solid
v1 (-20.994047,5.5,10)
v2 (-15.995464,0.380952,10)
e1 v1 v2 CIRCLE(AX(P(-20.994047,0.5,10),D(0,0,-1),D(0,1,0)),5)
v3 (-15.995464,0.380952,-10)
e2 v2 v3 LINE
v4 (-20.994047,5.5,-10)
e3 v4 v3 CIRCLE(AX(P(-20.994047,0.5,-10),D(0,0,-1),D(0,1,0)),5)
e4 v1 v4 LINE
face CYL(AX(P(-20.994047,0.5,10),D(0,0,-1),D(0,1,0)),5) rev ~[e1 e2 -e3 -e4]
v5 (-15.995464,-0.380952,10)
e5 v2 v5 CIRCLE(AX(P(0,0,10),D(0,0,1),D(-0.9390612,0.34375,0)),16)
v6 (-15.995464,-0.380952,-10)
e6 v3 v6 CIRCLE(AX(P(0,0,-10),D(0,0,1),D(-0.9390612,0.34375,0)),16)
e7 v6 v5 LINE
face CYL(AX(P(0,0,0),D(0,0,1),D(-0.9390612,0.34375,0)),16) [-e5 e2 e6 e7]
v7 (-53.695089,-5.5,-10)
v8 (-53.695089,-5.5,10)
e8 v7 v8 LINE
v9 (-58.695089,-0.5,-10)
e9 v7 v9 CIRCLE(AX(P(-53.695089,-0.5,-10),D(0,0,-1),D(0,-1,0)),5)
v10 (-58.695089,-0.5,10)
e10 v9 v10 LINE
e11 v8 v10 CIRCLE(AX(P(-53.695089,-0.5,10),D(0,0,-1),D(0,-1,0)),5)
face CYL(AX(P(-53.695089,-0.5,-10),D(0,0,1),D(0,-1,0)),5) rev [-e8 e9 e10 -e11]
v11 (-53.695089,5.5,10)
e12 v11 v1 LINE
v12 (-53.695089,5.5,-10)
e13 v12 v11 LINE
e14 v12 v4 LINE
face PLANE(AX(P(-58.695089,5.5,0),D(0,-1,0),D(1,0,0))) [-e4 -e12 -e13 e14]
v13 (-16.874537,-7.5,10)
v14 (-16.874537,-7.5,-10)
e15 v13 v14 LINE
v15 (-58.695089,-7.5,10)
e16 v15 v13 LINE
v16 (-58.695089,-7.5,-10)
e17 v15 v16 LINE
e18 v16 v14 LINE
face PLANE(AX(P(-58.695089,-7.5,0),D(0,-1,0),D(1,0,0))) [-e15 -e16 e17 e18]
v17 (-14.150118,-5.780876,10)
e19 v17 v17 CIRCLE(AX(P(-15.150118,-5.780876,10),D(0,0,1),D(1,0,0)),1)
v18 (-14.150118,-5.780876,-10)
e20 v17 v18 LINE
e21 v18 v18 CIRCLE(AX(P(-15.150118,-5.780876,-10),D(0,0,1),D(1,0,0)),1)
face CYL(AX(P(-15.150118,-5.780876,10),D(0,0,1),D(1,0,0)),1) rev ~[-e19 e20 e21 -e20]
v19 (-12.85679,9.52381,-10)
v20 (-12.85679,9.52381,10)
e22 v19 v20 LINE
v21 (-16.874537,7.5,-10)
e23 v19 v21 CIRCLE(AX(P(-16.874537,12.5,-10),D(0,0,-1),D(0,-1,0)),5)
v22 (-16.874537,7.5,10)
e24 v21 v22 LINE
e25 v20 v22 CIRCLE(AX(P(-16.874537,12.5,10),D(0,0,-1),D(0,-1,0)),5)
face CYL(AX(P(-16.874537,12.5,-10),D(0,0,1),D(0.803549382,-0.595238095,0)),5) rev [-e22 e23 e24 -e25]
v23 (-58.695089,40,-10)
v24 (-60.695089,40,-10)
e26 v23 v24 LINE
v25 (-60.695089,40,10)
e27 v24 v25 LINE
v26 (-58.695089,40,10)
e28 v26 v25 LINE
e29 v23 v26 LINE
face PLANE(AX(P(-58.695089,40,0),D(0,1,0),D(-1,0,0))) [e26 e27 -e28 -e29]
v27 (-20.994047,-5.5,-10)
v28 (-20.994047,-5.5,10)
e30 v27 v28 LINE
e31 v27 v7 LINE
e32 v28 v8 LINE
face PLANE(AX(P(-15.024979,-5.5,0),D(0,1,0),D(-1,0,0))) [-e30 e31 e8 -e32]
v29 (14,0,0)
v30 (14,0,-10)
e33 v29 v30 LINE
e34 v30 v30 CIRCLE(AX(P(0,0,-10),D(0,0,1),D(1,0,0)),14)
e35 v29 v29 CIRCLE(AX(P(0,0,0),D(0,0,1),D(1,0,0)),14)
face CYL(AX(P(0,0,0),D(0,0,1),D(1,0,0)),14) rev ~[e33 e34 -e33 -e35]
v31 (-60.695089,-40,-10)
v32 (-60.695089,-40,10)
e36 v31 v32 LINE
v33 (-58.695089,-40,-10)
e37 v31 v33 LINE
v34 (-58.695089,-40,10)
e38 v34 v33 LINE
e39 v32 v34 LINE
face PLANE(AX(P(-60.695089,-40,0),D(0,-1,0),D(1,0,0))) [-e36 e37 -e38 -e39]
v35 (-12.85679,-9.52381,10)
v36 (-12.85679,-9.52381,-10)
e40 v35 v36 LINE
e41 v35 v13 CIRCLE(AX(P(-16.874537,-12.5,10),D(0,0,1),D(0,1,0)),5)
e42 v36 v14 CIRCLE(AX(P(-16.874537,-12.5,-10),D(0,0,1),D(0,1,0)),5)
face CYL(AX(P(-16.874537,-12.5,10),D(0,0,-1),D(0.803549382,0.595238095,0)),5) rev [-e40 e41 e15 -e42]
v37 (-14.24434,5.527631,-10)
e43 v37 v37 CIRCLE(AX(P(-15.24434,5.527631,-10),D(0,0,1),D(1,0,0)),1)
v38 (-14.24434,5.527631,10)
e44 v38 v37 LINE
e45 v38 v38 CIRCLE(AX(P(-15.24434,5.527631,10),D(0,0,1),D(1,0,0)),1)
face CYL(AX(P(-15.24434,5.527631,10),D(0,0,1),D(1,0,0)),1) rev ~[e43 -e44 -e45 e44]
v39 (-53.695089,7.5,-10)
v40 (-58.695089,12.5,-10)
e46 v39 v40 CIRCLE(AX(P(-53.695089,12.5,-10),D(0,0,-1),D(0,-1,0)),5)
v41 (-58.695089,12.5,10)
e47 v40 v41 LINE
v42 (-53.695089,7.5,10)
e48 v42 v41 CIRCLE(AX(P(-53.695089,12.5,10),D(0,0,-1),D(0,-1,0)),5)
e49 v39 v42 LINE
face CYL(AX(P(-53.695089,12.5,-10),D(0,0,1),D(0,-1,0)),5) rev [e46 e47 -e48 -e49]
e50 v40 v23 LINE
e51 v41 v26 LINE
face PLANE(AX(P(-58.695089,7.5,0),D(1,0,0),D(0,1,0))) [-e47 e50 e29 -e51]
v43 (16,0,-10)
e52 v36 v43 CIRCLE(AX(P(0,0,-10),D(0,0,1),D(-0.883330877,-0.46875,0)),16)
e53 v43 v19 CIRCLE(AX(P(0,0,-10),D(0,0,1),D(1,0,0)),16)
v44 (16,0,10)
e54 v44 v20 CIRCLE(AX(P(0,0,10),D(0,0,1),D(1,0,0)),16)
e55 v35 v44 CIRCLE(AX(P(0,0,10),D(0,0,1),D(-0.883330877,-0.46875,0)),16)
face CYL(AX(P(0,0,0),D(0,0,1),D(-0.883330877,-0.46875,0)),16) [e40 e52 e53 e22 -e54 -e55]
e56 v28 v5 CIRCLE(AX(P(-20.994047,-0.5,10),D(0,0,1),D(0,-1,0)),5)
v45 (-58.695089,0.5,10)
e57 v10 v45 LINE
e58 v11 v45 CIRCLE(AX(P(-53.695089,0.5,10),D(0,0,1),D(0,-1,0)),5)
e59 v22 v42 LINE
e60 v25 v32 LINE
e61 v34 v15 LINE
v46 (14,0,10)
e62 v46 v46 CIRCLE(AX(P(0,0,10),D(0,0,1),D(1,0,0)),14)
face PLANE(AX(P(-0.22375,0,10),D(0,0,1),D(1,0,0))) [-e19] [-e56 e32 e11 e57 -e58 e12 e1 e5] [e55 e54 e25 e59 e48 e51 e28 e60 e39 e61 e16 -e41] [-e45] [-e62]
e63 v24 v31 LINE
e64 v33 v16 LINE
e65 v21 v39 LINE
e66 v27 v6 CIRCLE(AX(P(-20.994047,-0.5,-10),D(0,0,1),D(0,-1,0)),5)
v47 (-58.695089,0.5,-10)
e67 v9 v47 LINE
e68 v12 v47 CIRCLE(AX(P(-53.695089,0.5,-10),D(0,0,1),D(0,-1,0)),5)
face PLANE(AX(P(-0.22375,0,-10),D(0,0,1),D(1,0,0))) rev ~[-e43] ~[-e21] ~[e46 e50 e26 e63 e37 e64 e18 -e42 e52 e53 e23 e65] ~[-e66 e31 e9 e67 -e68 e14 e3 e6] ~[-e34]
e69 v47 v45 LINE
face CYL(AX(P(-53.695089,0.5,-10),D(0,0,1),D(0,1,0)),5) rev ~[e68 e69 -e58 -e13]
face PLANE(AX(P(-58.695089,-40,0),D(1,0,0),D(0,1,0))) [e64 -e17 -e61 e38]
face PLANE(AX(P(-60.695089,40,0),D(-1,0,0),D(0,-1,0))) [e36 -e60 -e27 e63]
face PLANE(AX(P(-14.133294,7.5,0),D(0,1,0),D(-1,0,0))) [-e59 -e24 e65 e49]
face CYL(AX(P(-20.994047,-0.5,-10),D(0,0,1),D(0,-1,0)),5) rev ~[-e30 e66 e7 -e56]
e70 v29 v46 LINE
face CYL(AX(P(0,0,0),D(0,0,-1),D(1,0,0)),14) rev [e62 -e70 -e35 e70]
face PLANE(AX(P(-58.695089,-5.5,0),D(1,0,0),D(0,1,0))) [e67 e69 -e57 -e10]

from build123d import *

# Parameters (mm, degrees)
F0_R          = 14
F1_DEPTH      = 10
F1_DEPTH_BACK = 10
F2_R          = 5
F3_R          = 5
F4_R          = 1
F5_DEPTH      = 25
F6_R          = 5


with BuildPart() as f1:
    # F0 (on Top) → F1 (new body, two sides)
    with BuildSketch(Plane.XY) as f1_sk:
        with BuildLine():
            ThreePointArc((-14.1332940251, -7.5), (3.86440782, -15.5263116097), (16, 0))
            ThreePointArc((16, 0), (3.86440782, 15.5263116097), (-14.1332940251, 7.5))
            ThreePointArc((-14.1332940251, 7.5), (-14.6133919535, 6.5152724896), (-15.0249792013, 5.5))
            ThreePointArc((-15.0249792013, 5.5), (-16, 0), (-15.0249792013, -5.5))
            ThreePointArc((-15.0249792013, -5.5), (-14.6133919535, -6.5152724896), (-14.1332940251, -7.5))
        make_face()
        Circle(F0_R, mode=Mode.SUBTRACT)
        with BuildLine():
            ThreePointArc((-15.0249792013, 5.5), (-14.6133919535, 6.5152724896), (-14.1332940251, 7.5))
            Line((-14.1332940251, 7.5), (-58.6950893998, 7.5))
            Line((-58.6950893998, 7.5), (-58.6950893998, 40))
            Line((-58.6950893998, 40), (-60.6950893998, 40))
            Line((-60.6950893998, 40), (-60.6950893998, -40))
            Line((-60.6950893998, -40), (-58.6950893998, -40))
            Line((-58.6950893998, -40), (-58.6950893998, -7.5))
            Line((-58.6950893998, -7.5), (-14.1332940251, -7.5))
            ThreePointArc((-14.1332940251, -7.5), (-14.6133919535, -6.5152724896), (-15.0249792013, -5.5))
            Line((-15.0249792013, -5.5), (-58.6950893998, -5.5))
            Line((-58.6950893998, -5.5), (-58.6950893998, 5.5))
            Line((-58.6950893998, 5.5), (-15.0249792013, 5.5))
        make_face()
    extrude(amount=F1_DEPTH)
    extrude(f1_sk.sketch, amount=-F1_DEPTH_BACK)

    # F2
    f2_edges = [f1.edges().sort_by_distance(p)[0] for p in [
        (-14.133294, -7.5, 0),
        (-15.024979, -5.5, 0),
        (-15.024979, 5.5, 0),
        (-14.133294, 7.5, 0),
    ]]
    fillet(f2_edges, radius=F2_R)

    # F3
    f3_edges = [f1.edges().sort_by_distance(p)[0] for p in [
        (-58.695089, -5.5, 0),
        (-58.695089, 5.5, 0),
    ]]
    fillet(f3_edges, radius=F3_R)

    # F4 (on face) → F5 (cut)
    with BuildSketch(Plane.XY.offset(10)):
        with Locations((-15.1501176879, -5.7808761485)):
            Circle(F4_R)
        with Locations((-15.2443397102, 5.5276307583)):
            Circle(F4_R)
    extrude(amount=-F5_DEPTH, mode=Mode.SUBTRACT)

    # F6
    f6_edges = [f1.edges().sort_by_distance(p)[0] for p in [
        (-58.695089, 7.5, 0),
    ]]
    fillet(f6_edges, radius=F6_R)


solid = f1.part
